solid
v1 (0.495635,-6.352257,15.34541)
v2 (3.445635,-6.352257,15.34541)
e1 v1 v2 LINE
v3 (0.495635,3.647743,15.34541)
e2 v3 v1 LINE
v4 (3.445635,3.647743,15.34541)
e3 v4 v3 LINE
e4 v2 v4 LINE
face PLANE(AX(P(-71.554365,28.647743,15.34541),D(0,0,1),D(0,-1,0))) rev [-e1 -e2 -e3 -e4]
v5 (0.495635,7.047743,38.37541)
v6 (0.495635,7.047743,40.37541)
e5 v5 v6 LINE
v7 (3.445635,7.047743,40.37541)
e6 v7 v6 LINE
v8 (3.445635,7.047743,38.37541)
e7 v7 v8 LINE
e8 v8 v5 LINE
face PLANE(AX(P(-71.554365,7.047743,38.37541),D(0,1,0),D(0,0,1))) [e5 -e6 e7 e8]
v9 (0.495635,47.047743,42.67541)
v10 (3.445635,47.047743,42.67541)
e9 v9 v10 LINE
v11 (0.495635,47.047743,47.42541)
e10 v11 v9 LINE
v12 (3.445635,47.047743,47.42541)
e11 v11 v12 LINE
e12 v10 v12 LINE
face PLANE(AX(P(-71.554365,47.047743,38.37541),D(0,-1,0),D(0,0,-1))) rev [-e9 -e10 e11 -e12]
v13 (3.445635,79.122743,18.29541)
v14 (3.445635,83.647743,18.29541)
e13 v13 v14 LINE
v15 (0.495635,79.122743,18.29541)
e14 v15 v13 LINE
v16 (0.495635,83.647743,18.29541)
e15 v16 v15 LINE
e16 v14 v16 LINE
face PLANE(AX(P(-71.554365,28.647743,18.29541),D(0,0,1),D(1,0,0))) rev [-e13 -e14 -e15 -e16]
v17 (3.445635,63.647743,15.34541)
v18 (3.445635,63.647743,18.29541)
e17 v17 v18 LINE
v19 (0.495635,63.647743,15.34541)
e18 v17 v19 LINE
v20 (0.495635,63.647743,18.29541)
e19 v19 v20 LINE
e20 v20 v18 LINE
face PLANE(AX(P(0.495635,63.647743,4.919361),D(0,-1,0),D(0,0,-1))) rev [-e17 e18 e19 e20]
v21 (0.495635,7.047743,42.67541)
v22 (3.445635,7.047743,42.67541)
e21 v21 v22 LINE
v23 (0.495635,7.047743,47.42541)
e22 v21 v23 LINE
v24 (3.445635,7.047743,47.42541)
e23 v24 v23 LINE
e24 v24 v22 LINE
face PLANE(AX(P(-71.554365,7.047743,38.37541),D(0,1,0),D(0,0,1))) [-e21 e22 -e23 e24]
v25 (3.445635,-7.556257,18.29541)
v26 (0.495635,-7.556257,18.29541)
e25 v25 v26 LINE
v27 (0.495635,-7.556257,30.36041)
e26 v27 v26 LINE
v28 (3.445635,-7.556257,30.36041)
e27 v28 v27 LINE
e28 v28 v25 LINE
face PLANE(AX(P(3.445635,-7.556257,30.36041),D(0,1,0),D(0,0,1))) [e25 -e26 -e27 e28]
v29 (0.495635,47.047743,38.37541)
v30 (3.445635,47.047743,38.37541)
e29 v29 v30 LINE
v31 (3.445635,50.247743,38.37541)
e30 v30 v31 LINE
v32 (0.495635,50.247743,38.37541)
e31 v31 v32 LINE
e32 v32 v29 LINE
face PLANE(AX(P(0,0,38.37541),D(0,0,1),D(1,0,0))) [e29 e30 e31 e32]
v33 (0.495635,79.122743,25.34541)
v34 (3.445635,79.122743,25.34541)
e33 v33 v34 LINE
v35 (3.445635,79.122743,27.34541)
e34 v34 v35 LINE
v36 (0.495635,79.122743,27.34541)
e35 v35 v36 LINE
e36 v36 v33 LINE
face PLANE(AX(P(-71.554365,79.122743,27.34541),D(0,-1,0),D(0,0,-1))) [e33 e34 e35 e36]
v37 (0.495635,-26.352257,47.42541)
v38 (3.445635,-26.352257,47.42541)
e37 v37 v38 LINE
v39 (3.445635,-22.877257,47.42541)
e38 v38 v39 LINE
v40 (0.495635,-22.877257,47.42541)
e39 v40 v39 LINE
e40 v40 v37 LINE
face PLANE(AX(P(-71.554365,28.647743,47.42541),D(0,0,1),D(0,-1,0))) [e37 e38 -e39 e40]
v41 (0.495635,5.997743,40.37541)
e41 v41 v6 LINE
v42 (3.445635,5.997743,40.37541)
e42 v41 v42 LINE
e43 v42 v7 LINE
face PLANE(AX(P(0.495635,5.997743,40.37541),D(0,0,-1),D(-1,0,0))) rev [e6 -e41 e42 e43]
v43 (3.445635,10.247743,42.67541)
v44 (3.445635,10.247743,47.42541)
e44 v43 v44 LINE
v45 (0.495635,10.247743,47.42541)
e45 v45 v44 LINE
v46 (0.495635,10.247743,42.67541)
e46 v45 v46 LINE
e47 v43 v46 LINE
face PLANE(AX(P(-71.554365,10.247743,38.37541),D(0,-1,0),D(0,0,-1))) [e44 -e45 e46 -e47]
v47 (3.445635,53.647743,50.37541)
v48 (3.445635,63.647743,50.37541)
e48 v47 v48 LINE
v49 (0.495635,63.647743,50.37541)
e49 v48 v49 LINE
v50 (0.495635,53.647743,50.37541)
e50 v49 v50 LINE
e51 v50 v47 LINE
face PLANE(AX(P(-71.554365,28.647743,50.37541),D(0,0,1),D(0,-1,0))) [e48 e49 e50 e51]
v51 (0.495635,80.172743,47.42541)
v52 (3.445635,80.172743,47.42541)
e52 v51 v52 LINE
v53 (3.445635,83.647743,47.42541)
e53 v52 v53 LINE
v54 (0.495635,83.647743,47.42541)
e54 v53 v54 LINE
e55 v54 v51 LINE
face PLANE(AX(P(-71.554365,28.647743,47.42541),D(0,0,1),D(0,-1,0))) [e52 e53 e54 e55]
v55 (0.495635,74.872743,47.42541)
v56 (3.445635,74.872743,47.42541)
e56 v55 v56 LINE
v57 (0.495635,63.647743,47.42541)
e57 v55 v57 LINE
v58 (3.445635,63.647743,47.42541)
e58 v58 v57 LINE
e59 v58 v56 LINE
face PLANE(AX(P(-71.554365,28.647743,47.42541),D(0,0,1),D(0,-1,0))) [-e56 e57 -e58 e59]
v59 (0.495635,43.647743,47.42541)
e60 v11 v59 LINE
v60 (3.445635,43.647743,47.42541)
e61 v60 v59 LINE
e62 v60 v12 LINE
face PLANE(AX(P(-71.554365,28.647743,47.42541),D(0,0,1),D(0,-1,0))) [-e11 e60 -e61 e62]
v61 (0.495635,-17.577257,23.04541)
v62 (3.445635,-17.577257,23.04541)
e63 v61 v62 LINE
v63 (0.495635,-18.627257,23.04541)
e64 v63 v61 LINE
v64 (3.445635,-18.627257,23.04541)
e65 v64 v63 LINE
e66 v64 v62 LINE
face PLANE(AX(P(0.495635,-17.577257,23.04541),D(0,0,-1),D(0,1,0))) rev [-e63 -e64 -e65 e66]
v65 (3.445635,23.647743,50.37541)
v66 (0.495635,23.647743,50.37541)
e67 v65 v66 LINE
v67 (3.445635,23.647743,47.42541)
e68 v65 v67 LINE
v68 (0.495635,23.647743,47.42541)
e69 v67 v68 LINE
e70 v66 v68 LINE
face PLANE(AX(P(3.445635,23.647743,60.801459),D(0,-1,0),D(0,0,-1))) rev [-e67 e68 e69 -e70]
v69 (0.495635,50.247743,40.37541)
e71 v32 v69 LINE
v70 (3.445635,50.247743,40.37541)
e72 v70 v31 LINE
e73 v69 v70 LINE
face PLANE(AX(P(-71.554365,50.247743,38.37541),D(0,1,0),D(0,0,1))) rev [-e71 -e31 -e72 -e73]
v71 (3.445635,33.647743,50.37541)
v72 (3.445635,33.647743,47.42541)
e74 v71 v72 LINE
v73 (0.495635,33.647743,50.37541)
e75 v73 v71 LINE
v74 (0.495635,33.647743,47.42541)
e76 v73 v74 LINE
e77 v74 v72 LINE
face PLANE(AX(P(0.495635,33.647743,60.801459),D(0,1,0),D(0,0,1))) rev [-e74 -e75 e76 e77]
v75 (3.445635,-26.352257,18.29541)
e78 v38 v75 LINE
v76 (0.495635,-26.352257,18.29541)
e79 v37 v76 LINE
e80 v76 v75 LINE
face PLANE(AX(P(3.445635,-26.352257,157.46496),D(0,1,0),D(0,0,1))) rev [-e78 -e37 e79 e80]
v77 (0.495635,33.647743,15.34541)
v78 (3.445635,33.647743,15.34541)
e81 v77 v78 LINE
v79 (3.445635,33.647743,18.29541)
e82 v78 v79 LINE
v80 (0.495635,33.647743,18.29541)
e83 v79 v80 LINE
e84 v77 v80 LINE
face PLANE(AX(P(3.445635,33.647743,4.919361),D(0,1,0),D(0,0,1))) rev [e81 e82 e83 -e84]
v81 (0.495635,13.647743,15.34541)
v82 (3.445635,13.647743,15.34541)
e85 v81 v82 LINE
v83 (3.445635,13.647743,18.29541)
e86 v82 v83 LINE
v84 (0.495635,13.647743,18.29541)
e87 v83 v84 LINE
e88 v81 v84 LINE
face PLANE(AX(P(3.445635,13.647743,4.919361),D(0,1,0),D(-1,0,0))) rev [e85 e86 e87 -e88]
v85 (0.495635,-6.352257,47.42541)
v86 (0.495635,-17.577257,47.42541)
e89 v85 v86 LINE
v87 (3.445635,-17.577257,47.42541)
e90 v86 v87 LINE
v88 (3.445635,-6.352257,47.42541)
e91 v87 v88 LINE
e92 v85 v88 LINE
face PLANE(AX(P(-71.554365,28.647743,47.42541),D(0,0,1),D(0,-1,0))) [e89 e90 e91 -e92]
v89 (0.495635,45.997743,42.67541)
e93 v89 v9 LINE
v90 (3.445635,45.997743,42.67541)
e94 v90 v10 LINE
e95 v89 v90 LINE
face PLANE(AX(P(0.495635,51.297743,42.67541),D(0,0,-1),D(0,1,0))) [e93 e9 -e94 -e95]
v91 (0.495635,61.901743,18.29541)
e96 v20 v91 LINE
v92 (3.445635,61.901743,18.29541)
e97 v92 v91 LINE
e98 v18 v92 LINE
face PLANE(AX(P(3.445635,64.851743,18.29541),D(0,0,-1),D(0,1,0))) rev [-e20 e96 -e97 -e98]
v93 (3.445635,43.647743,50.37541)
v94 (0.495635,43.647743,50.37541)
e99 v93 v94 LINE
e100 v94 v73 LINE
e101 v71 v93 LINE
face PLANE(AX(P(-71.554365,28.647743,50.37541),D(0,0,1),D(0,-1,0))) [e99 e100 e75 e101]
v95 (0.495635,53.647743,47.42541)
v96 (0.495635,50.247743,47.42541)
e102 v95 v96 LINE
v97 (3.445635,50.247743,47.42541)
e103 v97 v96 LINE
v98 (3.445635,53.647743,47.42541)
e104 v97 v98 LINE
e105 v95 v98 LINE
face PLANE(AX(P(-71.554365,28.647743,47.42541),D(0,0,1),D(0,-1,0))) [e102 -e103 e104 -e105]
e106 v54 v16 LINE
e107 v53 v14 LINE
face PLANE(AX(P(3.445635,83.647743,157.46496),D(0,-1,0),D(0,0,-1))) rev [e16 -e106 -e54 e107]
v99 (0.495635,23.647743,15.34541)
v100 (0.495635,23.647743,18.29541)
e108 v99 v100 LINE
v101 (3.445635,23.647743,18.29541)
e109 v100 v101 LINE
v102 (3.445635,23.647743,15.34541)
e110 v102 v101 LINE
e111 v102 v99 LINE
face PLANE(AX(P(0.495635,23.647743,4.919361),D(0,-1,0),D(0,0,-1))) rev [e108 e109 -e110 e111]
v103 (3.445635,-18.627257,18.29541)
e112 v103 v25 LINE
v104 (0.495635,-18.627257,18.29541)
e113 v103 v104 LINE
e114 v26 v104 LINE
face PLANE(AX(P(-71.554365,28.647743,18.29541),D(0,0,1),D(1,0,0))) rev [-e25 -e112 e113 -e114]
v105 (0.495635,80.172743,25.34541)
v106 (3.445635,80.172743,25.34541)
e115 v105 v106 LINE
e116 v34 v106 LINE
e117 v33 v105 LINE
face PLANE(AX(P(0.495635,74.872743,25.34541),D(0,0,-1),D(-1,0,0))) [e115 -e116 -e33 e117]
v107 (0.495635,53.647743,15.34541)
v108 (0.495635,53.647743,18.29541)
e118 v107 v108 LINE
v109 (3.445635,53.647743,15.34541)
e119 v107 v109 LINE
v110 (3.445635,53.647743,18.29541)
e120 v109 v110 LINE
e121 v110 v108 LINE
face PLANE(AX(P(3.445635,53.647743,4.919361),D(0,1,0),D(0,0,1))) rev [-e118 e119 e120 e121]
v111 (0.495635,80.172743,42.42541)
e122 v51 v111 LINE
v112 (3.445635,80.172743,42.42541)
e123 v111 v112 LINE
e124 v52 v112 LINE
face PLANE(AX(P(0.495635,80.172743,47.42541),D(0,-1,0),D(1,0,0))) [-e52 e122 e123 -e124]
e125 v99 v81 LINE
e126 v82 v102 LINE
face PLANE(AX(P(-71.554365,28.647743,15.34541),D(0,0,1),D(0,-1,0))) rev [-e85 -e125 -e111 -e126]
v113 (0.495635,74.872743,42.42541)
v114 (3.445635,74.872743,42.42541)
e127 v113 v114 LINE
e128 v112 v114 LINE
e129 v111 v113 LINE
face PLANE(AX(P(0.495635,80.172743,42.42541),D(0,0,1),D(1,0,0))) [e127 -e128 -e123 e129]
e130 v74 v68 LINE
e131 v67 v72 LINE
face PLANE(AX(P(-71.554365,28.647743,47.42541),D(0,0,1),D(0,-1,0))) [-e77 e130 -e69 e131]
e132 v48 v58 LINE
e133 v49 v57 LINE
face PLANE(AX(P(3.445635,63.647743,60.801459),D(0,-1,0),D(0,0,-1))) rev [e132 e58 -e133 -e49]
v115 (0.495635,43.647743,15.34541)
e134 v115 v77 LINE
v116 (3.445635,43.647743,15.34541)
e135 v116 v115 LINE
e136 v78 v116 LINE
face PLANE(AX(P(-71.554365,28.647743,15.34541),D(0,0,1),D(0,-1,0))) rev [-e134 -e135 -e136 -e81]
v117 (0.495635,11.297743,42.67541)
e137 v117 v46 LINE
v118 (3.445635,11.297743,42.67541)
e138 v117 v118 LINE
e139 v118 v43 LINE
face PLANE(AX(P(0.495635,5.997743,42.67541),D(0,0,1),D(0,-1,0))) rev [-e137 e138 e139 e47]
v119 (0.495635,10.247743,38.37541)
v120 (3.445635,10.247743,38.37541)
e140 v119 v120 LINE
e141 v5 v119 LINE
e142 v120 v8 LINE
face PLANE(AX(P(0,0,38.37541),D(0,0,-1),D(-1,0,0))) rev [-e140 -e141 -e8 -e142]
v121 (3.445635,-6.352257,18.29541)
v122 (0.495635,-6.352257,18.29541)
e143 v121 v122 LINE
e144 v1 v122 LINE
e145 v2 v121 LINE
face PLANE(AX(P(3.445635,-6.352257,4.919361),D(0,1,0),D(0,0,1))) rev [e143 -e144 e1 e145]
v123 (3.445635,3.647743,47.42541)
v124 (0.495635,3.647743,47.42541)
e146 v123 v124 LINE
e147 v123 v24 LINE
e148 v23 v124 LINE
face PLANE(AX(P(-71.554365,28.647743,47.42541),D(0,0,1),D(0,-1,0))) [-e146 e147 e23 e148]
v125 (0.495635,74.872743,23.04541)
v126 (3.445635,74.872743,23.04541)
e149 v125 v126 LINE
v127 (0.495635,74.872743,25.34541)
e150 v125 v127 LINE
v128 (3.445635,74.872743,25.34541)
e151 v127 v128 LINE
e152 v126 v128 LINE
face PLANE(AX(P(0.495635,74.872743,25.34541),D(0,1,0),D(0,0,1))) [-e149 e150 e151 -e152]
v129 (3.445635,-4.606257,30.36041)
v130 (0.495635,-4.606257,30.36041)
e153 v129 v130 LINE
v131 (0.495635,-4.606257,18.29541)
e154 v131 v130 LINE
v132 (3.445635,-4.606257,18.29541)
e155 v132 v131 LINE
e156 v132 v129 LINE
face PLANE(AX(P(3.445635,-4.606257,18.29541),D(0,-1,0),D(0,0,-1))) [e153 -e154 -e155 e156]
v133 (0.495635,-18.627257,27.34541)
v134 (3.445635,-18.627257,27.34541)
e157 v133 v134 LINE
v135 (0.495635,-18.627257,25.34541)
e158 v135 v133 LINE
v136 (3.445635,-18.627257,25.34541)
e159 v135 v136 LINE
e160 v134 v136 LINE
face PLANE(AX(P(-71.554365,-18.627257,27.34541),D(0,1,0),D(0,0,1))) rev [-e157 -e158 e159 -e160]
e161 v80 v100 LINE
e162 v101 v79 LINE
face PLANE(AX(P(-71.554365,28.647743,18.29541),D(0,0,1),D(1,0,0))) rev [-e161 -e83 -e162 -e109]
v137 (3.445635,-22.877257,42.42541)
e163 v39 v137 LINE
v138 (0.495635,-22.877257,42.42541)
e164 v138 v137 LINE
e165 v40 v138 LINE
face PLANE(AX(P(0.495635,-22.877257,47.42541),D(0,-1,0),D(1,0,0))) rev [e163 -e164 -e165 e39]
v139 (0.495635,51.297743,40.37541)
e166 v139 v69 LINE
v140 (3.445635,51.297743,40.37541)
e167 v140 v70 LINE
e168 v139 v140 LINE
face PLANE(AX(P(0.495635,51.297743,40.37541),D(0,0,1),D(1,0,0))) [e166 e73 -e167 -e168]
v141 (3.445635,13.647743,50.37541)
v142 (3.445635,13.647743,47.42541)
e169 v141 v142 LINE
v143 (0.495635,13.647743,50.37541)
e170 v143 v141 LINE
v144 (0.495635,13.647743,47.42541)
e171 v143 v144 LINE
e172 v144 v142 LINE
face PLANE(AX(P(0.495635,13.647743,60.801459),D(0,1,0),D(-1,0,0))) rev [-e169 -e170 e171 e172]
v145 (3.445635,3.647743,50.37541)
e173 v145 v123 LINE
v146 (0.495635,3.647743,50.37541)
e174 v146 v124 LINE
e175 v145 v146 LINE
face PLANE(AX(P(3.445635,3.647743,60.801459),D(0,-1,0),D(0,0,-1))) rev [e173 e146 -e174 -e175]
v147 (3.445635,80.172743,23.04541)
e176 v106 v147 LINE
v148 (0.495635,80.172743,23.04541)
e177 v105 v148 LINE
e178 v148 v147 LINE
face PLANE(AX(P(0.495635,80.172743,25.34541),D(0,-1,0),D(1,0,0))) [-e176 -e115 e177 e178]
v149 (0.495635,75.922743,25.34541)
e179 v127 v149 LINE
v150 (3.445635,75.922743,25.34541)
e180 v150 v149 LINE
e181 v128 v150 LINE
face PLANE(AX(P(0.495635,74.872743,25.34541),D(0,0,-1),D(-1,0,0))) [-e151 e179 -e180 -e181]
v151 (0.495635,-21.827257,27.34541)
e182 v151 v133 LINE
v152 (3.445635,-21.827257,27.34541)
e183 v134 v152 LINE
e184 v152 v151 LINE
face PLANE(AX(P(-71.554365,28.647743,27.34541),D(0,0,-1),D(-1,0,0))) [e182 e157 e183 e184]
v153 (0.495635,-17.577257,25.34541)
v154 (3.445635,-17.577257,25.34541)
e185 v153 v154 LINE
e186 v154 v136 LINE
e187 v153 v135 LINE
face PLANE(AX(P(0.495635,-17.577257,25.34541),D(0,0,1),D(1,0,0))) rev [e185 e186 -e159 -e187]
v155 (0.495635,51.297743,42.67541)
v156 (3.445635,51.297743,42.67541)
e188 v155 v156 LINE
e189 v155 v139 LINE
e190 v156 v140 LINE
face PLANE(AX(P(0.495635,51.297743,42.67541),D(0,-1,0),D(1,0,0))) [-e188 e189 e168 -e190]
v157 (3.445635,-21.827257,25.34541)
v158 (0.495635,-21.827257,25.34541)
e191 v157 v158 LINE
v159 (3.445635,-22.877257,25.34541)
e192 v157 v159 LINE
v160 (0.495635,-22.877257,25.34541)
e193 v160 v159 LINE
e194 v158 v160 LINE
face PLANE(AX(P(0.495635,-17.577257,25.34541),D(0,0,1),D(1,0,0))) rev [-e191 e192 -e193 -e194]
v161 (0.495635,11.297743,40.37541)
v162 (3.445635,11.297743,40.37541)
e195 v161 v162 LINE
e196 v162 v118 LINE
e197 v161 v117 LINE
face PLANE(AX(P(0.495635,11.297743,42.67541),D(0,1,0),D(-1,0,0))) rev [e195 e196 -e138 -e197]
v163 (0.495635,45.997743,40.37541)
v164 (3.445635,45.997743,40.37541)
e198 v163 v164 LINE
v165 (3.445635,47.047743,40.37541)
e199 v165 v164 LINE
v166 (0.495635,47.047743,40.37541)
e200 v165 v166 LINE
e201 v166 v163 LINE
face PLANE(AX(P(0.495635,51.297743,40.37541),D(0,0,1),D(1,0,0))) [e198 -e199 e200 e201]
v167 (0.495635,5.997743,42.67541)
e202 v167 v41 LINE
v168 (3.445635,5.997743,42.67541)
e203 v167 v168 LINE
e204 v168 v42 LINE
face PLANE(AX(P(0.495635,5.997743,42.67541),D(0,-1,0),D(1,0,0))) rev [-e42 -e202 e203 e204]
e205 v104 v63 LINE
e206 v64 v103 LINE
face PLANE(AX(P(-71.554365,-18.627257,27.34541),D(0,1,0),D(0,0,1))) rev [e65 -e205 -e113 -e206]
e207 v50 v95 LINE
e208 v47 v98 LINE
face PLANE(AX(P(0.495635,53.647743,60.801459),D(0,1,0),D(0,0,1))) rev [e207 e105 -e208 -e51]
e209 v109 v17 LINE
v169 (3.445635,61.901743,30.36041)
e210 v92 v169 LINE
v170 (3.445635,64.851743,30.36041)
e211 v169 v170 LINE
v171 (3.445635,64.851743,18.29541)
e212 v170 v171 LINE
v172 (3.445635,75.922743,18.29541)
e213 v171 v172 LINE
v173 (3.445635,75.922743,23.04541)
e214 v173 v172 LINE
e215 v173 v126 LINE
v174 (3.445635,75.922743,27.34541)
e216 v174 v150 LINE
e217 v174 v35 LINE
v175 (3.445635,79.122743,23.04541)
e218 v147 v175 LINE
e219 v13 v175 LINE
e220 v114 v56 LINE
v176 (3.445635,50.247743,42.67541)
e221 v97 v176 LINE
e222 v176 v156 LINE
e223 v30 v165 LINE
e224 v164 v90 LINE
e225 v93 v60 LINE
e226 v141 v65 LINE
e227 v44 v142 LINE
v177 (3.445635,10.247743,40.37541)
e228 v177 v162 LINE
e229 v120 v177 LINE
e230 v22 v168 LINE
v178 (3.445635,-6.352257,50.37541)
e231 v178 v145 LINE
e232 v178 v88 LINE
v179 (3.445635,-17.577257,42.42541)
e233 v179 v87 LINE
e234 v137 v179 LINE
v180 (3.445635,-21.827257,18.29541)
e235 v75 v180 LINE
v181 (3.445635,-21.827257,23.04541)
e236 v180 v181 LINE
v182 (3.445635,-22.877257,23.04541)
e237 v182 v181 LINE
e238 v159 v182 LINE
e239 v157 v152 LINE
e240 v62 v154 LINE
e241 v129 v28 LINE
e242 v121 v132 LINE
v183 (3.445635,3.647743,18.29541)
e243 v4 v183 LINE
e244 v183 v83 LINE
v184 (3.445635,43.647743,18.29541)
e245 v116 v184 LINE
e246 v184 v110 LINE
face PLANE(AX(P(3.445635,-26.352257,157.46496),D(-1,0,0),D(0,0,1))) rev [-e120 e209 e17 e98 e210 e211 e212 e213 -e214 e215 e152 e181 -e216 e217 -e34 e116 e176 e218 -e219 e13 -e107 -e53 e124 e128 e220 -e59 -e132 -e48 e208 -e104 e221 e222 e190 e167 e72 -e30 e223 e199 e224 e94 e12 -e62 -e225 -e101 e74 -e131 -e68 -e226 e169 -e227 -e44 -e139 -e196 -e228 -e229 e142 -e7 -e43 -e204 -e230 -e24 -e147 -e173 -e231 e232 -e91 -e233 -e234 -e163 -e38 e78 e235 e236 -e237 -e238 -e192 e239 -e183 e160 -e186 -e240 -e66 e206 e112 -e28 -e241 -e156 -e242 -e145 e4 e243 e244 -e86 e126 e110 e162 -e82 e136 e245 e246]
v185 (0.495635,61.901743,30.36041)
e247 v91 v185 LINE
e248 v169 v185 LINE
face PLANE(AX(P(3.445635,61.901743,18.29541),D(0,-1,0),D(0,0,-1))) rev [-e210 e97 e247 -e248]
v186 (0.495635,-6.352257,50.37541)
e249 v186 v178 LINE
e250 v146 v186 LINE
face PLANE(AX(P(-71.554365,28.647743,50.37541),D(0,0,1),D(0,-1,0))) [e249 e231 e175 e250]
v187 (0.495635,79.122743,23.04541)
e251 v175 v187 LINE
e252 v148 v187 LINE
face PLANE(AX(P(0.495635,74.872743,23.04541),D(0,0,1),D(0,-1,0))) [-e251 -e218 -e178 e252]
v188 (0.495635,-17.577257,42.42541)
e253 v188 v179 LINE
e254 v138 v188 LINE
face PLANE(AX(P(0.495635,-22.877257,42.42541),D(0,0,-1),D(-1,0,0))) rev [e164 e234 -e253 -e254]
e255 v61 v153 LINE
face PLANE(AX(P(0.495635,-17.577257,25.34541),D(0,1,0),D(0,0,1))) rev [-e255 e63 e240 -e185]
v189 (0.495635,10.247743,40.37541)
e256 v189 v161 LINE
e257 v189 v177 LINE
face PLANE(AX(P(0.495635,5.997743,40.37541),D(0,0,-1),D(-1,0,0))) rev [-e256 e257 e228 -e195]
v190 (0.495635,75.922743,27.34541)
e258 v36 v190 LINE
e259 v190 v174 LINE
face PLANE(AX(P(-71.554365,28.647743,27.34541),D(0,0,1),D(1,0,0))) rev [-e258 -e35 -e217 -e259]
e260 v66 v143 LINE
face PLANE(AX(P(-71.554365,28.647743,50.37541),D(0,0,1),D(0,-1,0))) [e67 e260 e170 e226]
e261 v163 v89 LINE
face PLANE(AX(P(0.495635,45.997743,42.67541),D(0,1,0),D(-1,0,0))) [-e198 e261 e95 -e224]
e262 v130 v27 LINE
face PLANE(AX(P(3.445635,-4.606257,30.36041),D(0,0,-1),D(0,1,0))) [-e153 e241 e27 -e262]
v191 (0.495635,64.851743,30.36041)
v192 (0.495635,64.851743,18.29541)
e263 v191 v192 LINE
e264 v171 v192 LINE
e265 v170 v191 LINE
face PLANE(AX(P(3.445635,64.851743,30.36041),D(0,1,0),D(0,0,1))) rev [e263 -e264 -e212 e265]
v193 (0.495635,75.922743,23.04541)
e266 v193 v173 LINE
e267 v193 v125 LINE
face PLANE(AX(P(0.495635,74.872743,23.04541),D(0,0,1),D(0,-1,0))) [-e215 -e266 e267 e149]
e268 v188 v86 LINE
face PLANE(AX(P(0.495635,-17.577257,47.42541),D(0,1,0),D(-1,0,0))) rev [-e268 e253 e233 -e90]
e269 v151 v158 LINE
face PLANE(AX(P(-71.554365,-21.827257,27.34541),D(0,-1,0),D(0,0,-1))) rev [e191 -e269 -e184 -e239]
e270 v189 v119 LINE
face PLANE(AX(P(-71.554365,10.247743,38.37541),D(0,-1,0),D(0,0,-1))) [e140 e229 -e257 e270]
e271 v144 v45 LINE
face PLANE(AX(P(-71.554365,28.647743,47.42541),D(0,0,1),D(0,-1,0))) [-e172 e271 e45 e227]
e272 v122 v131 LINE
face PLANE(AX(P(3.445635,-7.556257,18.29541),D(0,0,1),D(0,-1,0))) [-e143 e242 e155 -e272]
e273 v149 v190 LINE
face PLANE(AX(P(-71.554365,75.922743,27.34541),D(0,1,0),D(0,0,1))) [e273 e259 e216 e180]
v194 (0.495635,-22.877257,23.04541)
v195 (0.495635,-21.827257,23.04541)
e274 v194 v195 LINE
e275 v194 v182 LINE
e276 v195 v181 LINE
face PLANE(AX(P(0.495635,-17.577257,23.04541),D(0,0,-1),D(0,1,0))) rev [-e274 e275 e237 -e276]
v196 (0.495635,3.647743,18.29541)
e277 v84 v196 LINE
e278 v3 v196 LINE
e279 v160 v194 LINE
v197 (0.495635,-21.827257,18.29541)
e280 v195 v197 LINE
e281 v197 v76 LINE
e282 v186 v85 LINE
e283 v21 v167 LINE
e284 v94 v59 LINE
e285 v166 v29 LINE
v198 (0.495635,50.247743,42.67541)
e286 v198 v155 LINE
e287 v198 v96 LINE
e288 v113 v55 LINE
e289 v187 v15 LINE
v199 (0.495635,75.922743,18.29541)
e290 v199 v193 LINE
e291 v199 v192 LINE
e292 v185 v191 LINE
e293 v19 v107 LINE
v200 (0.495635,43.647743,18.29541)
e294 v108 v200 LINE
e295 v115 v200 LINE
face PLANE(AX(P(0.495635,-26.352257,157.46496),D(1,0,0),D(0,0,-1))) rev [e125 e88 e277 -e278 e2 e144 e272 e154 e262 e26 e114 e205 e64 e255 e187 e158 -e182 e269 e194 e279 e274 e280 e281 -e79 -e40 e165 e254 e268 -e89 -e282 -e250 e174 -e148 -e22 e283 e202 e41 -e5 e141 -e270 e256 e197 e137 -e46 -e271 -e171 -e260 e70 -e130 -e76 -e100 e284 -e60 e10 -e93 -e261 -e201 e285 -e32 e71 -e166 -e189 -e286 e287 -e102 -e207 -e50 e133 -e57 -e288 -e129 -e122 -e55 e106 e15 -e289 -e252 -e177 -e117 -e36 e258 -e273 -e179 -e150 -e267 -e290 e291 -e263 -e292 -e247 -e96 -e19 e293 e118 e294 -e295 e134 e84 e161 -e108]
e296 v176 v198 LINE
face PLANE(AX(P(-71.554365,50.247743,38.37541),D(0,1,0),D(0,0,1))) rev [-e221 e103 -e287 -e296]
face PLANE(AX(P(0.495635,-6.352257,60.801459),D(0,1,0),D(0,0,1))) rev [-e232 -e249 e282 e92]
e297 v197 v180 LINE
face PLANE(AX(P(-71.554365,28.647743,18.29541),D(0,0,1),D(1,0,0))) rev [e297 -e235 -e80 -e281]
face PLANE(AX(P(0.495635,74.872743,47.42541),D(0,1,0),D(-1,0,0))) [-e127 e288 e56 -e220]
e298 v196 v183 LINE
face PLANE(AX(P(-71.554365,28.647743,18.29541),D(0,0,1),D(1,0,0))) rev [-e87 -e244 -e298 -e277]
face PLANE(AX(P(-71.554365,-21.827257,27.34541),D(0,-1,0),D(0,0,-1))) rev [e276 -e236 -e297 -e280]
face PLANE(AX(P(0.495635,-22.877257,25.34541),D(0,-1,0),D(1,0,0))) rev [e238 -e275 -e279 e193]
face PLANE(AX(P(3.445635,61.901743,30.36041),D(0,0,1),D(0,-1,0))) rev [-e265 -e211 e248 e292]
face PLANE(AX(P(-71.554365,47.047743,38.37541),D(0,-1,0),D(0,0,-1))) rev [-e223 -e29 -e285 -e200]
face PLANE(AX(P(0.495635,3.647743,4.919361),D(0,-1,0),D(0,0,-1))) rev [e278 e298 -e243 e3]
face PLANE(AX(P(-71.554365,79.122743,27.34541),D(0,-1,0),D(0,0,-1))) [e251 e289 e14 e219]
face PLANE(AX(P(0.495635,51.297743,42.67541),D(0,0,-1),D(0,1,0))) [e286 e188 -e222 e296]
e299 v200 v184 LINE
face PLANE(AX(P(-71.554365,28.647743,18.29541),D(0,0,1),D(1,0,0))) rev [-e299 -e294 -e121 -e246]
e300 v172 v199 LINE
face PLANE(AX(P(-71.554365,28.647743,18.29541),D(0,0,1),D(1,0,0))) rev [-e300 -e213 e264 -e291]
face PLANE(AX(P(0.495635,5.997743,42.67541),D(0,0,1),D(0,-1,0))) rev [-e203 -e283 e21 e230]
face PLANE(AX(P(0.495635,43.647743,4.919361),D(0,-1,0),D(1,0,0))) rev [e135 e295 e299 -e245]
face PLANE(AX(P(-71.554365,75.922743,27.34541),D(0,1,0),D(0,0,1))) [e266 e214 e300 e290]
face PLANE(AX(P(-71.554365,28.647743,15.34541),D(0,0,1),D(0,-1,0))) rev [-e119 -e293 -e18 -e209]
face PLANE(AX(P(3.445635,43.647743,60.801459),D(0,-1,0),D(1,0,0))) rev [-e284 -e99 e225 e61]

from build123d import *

# Parameters (mm, degrees)
FRONT_START        = 0.495634701
FRONT_PLATE_DEPTH  = 2.95
SKETCH1_W          = 5
SKETCH1_H          = 5.3
CUT_EXTRUDE2_DEPTH = 98.689964927
CUT_EXTRUDE3_START = 2.95
SKETCH3_W          = 3.2
SKETCH3_H          = 3.2
CUT_EXTRUDE3_DEPTH = 12
SKETCH4_W          = 2.3
SKETCH4_H          = 5.3
CUT_EXTRUDE4_DEPTH = 98.689964927


# Read off the part's stored shape, not the designer's step: Front Plate
with BuildPart() as part:
    # Front Plate outline → Front Plate (new body)
    with BuildSketch(Plane.YZ.offset(FRONT_START)):
        Polygon((-18.627257495, 18.295409887), (-7.556257495, 18.295409887), (-7.556257495, 30.360409887), (-4.606257495, 30.360409887), (-4.606257495, 18.295409887), (-6.352257495, 18.295409887), (-6.352257495, 15.345409887), (3.647742505, 15.345409887), (3.647742505, 18.295409887), (13.647742505, 18.295409887), (13.647742505, 15.345409887), (23.647742505, 15.345409887), (23.647742505, 18.295409887), (33.647742505, 18.295409887), (33.647742505, 15.345409887), (43.647742505, 15.345409887), (43.647742505, 18.295409887), (53.647742505, 18.295409887), (53.647742505, 15.345409887), (63.647742505, 15.345409887), (63.647742505, 18.295409887), (61.901742505, 18.295409887), (61.901742505, 30.360409887), (64.851742505, 30.360409887), (64.851742505, 18.295409887), (75.922742505, 18.295409887), (75.922742505, 23.045409887), (74.872742505, 23.045409887), (74.872742505, 25.345409887), (75.922742505, 25.345409887), (75.922742505, 27.345409887), (79.122742505, 27.345409887), (79.122742505, 25.345409887), (80.172742505, 25.345409887), (80.172742505, 23.045409887), (79.122742505, 23.045409887), (79.122742505, 18.295409887), (83.647742505, 18.295409887), (83.647742505, 47.425409887), (63.647742505, 47.425409887), (63.647742505, 50.375409887), (53.647742505, 50.375409887), (53.647742505, 47.425409887), (43.647742505, 47.425409887), (43.647742505, 50.375409887), (33.647742505, 50.375409887), (33.647742505, 47.425409887), (23.647742505, 47.425409887), (23.647742505, 50.375409887), (13.647742505, 50.375409887), (13.647742505, 47.425409887), (3.647742505, 47.425409887), (3.647742505, 50.375409887), (-6.352257495, 50.375409887), (-6.352257495, 47.425409887), (-26.352257495, 47.425409887), (-26.352257495, 18.295409887), (-21.827257495, 18.295409887), (-21.827257495, 23.045409887), (-22.877257495, 23.045409887), (-22.877257495, 25.345409887), (-21.827257495, 25.345409887), (-21.827257495, 27.345409887), (-18.627257495, 27.345409887), (-18.627257495, 25.345409887), (-17.577257495, 25.345409887), (-17.577257495, 23.045409887), (-18.627257495, 23.045409887), align=None)
    extrude(amount=FRONT_PLATE_DEPTH)

    # Sketch1 → Cut-Extrude2 (cut, through all)
    with BuildSketch(Plane(origin=(3.445634701, 0, 0), x_dir=(0, 0, -1), z_dir=(1, 0, 0))):
        with Locations((-44.925409887, -20.227257495)):
            Rectangle(SKETCH1_W, SKETCH1_H)
    cut_extrude2 = extrude(amount=-CUT_EXTRUDE2_DEPTH, mode=Mode.SUBTRACT)

    # Sketch3 → Cut-Extrude3 (cut)
    with BuildSketch(Plane.XY.offset(47.425409887).offset(CUT_EXTRUDE3_START)):
        with Locations((1.970634701, 8.647742505)):
            Rectangle(SKETCH3_W, SKETCH3_H)
    cut_extrude3 = extrude(amount=-CUT_EXTRUDE3_DEPTH, mode=Mode.SUBTRACT)

    # Sketch4 → Cut-Extrude4 (cut, through all)
    with BuildSketch(Plane(origin=(3.445634701, 0, 0), x_dir=(0, 0, -1), z_dir=(1, 0, 0))):
        with Locations((-41.525409887, 8.647742505)):
            Rectangle(SKETCH4_W, SKETCH4_H)
    cut_extrude4 = extrude(amount=-CUT_EXTRUDE4_DEPTH, mode=Mode.SUBTRACT)

    # Mirror1: Cut-Extrude2, Cut-Extrude3, Cut-Extrude4 across plane
    add(cut_extrude2.mirror(Plane.ZX.offset(28.647742505)), mode=Mode.SUBTRACT)
    add(cut_extrude3.mirror(Plane.ZX.offset(28.647742505)), mode=Mode.SUBTRACT)
    add(cut_extrude4.mirror(Plane.ZX.offset(28.647742505)), mode=Mode.SUBTRACT)


solid = part.part
